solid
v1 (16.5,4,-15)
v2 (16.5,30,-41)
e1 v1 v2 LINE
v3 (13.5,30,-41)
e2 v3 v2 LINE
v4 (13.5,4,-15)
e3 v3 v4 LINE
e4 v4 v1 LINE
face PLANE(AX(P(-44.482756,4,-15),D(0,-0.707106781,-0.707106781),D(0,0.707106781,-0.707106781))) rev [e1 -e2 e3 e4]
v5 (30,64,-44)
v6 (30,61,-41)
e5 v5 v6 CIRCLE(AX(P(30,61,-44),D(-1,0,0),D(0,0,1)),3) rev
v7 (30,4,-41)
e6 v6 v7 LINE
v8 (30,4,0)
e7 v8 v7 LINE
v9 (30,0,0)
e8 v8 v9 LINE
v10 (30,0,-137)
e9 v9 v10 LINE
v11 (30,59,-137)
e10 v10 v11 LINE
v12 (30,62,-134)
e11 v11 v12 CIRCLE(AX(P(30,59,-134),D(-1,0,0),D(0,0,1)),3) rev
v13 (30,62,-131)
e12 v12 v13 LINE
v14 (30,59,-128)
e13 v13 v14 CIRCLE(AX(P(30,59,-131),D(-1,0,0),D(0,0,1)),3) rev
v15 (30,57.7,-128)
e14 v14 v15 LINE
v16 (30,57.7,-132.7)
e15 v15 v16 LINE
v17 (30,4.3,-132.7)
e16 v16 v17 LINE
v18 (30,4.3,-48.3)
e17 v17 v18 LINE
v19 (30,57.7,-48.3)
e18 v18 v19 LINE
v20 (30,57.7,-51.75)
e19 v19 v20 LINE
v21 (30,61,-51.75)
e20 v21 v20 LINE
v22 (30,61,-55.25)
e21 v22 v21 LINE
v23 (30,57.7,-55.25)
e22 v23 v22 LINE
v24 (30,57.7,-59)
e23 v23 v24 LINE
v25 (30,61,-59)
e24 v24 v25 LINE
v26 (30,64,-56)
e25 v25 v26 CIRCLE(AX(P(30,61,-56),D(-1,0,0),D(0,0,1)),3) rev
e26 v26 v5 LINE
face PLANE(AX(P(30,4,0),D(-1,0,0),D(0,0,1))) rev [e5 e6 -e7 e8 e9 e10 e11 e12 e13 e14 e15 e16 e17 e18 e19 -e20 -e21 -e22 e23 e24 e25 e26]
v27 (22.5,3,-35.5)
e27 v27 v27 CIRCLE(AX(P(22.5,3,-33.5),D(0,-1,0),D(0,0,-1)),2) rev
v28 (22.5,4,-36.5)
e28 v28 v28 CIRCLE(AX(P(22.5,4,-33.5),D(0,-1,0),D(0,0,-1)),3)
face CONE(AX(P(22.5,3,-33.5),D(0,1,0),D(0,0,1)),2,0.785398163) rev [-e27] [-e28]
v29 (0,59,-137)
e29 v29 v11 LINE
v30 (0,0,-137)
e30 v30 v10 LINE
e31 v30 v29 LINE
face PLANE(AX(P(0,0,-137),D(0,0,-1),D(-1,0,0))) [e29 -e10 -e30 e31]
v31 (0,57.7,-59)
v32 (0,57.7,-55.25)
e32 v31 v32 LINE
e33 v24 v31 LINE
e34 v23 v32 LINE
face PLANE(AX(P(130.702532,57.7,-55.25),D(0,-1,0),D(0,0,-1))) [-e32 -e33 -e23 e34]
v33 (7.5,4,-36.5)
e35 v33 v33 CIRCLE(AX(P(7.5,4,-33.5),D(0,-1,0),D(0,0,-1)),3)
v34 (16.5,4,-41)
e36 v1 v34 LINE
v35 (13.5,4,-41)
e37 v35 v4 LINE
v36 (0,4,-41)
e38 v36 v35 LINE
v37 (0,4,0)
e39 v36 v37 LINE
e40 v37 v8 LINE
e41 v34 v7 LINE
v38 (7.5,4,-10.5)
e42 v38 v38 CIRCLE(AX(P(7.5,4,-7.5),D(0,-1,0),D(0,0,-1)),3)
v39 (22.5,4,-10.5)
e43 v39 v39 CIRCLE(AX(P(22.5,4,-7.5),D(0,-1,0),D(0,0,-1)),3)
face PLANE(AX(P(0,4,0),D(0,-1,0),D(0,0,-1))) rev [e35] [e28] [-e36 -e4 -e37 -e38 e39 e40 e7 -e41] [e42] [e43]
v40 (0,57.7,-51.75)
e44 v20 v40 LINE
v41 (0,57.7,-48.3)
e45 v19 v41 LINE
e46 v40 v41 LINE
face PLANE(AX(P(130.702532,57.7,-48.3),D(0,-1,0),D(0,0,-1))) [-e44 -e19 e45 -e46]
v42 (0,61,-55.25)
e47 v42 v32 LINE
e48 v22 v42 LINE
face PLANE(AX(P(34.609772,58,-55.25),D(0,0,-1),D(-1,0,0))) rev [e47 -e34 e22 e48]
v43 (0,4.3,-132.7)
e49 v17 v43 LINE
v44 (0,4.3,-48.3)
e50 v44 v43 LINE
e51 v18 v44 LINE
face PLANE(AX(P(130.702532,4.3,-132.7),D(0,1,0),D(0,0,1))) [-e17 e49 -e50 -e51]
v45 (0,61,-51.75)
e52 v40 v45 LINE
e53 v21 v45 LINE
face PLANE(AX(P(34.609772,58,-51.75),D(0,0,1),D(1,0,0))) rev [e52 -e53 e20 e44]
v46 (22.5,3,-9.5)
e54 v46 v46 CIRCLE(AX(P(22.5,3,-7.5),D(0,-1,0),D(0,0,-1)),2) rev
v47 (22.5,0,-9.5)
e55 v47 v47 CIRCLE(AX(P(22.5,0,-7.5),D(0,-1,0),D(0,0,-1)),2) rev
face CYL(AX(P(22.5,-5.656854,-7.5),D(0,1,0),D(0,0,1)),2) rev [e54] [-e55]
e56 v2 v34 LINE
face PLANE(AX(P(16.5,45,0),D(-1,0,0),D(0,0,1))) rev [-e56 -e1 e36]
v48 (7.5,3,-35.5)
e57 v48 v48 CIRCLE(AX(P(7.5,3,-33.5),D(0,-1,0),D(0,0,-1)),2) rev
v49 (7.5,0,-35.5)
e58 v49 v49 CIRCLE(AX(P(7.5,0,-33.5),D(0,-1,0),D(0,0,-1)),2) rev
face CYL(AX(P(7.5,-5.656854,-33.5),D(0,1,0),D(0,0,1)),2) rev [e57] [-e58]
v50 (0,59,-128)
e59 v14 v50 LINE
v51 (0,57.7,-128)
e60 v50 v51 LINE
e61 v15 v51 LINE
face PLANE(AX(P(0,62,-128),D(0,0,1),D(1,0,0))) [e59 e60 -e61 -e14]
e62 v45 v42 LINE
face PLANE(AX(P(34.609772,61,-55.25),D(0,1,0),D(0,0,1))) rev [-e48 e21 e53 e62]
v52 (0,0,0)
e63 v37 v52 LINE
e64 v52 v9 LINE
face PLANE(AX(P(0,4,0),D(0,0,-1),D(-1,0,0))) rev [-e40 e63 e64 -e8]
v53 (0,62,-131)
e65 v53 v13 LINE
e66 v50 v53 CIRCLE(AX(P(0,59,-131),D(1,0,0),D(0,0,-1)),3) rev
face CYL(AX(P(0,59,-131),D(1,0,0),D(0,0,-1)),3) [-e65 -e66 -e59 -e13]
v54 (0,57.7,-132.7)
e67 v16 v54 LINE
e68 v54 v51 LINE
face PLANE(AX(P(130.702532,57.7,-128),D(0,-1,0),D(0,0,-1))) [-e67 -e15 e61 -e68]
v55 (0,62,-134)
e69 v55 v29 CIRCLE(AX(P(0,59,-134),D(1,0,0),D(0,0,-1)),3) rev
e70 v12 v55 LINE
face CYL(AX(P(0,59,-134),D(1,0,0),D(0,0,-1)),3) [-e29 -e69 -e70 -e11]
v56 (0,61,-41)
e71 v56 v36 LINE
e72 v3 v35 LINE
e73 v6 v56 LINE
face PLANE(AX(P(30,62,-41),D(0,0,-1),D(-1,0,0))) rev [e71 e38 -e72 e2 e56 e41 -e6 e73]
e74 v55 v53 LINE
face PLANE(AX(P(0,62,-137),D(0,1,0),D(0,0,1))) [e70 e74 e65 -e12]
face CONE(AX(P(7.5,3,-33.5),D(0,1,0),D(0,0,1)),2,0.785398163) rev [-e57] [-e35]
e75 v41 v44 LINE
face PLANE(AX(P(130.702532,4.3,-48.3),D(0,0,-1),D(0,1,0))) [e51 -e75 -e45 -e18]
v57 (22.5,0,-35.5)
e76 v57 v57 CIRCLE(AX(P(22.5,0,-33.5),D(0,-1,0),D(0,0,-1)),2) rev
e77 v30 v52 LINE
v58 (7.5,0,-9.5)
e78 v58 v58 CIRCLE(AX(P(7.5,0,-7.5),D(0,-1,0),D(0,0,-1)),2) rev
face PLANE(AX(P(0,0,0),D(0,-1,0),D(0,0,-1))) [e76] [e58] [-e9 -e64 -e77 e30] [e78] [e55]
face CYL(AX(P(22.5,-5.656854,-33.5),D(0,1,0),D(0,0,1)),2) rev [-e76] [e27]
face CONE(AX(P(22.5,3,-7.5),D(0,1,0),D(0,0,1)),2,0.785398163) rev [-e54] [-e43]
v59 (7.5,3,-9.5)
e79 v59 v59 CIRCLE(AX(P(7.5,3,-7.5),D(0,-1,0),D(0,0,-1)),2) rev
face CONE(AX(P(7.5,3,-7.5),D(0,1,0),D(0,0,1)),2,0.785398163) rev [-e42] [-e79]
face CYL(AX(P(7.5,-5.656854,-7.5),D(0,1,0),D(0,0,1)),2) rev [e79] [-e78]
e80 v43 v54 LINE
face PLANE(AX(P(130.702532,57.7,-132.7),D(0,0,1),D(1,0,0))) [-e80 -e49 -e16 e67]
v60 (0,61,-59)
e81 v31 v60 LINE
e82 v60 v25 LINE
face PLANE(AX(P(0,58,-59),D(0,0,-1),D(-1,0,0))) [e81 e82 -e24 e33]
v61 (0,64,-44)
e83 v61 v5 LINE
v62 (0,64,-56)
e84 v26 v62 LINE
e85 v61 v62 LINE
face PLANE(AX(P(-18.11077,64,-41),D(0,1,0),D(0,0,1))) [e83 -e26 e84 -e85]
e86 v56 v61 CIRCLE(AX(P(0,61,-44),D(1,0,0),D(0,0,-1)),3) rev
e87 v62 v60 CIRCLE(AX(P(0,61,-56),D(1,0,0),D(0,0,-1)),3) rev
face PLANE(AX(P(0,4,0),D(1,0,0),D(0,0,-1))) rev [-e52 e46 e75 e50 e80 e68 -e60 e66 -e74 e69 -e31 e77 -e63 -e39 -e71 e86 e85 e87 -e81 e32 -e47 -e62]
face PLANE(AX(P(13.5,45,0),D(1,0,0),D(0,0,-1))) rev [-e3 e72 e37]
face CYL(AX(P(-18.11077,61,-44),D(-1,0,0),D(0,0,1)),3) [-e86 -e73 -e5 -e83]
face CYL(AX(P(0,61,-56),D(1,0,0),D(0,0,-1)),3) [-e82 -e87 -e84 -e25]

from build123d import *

# Parameters (mm, degrees)
SKETCH1_W           = 30
SKETCH1_H           = 45
BOSS_EXTRUDE1_DEPTH = 4
SKETCH2_W           = 30
SKETCH2_H           = 4
BOSS_EXTRUDE2_DEPTH = 58
SKETCH7_W           = 3
SKETCH7_H           = 41
BOSS_EXTRUDE3_DEPTH = 41
CUT_EXTRUDE1_DEPTH  = 3
SKETCH10_R          = 2
CUT_EXTRUDE2_DEPTH  = 4
CHAMFER1_SIZE       = 1
BOSS_EXTRUDE4_DEPTH = 15
SKETCH12_W          = 3.5
SKETCH12_H          = 3
CUT_EXTRUDE3_DEPTH  = 30
SKETCH13_W          = 18
SKETCH13_H          = 2
BOSS_EXTRUDE5_DEPTH = 30
SKETCH14_W          = 1
SKETCH14_H          = 54
CUT_EXTRUDE4_DEPTH  = 30
SKETCH15_W          = 3.75
SKETCH15_H          = 0.3
BOSS_EXTRUDE6_DEPTH = 30
FILLET1_R           = 3


with BuildPart() as part:
    # Sketch1 → Boss-Extrude1 (new body)
    with BuildSketch(Plane(origin=(0, 0, 0), x_dir=(1, 0, 0), z_dir=(0, 1, 0))):
        with Locations((15, 22.5)):
            Rectangle(SKETCH1_W, SKETCH1_H)
    extrude(amount=BOSS_EXTRUDE1_DEPTH)

    # Sketch2 → Boss-Extrude2 (add)
    with BuildSketch(Plane(origin=(0, 4, 0), x_dir=(1, 0, 0), z_dir=(0, 1, 0))):
        with Locations((15, 43)):
            Rectangle(SKETCH2_W, SKETCH2_H)
    extrude(amount=BOSS_EXTRUDE2_DEPTH)

    # Sketch7 → Boss-Extrude3 (add)
    with BuildSketch(Plane(origin=(0, 4, 0), x_dir=(1, 0, 0), z_dir=(0, 1, 0))):
        with Locations((15, 20.5)):
            Rectangle(SKETCH7_W, SKETCH7_H)
    extrude(amount=BOSS_EXTRUDE3_DEPTH)

    # Sketch8 → Cut-Extrude1 (cut)
    with BuildSketch(Plane(origin=(16.5, 0, 0), x_dir=(0, 0, -1), z_dir=(1, 0, 0))):
        Polygon((41, 45), (0, 45), (0, 4), (15, 4), (41, 30), align=None)
    extrude(amount=-CUT_EXTRUDE1_DEPTH, mode=Mode.SUBTRACT)

    # Sketch10 → Cut-Extrude2 (cut)
    with BuildSketch(Plane(origin=(0, 4, 0), x_dir=(1, 0, 0), z_dir=(0, 1, 0))):
        with Locations(Location((7.5, 7.5, 0), (0, 0, 270))):
            Circle(SKETCH10_R)
        with Locations(Location((22.5, 7.5, 0), (0, 0, 270))):
            Circle(SKETCH10_R)
        with Locations(Location((22.5, 33.5, 0), (0, 0, 90))):
            Circle(SKETCH10_R)
        with Locations(Location((7.5, 33.5, 0), (0, 0, 90))):
            Circle(SKETCH10_R)
    extrude(amount=-CUT_EXTRUDE2_DEPTH, mode=Mode.SUBTRACT)

    # Chamfer1
    chamfer1_edges = [part.edges().sort_by_distance(p)[0] for p in [
        (7.5, 4, -31.5),
        (22.5, 4, -31.5),
        (22.5, 4, -9.5),
        (7.5, 4, -9.5),
    ]]
    chamfer(chamfer1_edges, length=CHAMFER1_SIZE)

    # Sketch11 → Boss-Extrude4 (add, symmetric)
    with BuildSketch(Plane(origin=(15, 0, 0), x_dir=(0, 0, -1), z_dir=(1, 0, 0))):
        Polygon((45, 0), (137, 0), (137, 62), (128, 62), (128, 58), (133, 58), (133, 4), (49, 4), (49, 58), (59, 58), (59, 62), (45, 62), align=None)
    extrude(amount=BOSS_EXTRUDE4_DEPTH, both=True)

    # Sketch12 → Cut-Extrude3 (cut)
    with BuildSketch(Plane.ZY):
        with Locations((-53.5, 59.5)):
            Rectangle(SKETCH12_W, SKETCH12_H)
    extrude(amount=-CUT_EXTRUDE3_DEPTH, mode=Mode.SUBTRACT)

    # Sketch13 → Boss-Extrude5 (add)
    with BuildSketch(Plane(origin=(30, 0, 0), x_dir=(0, 0, -1), z_dir=(1, 0, 0))):
        with Locations((50, 63)):
            Rectangle(SKETCH13_W, SKETCH13_H)
    extrude(amount=-BOSS_EXTRUDE5_DEPTH)

    # Sketch14 → Cut-Extrude4 (cut)
    with BuildSketch(Plane.ZY):
        with Locations((-48.5, 31)):
            Rectangle(SKETCH14_W, SKETCH14_H)
    extrude(amount=-CUT_EXTRUDE4_DEPTH, mode=Mode.SUBTRACT)

    # Sketch15 → Boss-Extrude6 (add)
    with BuildSketch(Plane.ZY):
        with Locations((-57.125, 57.85)):
            Rectangle(SKETCH15_W, SKETCH15_H)
        Polygon((-51.75, 58), (-51.75, 57.7), (-48.3, 57.7), (-48.3, 4.3), (-132.7, 4.3), (-132.7, 57.7), (-128, 57.7), (-128, 58), (-133, 58), (-133, 4), (-48, 4), (-48, 58), align=None)
    extrude(amount=-BOSS_EXTRUDE6_DEPTH)

    # Fillet1
    fillet1_edges = [part.edges().sort_by_distance(p)[0] for p in [
        (15, 64, -41),
        (15, 64, -59),
        (15, 62, -128),
        (15, 62, -137),
    ]]
    fillet(fillet1_edges, radius=FILLET1_R)


solid = part.part
